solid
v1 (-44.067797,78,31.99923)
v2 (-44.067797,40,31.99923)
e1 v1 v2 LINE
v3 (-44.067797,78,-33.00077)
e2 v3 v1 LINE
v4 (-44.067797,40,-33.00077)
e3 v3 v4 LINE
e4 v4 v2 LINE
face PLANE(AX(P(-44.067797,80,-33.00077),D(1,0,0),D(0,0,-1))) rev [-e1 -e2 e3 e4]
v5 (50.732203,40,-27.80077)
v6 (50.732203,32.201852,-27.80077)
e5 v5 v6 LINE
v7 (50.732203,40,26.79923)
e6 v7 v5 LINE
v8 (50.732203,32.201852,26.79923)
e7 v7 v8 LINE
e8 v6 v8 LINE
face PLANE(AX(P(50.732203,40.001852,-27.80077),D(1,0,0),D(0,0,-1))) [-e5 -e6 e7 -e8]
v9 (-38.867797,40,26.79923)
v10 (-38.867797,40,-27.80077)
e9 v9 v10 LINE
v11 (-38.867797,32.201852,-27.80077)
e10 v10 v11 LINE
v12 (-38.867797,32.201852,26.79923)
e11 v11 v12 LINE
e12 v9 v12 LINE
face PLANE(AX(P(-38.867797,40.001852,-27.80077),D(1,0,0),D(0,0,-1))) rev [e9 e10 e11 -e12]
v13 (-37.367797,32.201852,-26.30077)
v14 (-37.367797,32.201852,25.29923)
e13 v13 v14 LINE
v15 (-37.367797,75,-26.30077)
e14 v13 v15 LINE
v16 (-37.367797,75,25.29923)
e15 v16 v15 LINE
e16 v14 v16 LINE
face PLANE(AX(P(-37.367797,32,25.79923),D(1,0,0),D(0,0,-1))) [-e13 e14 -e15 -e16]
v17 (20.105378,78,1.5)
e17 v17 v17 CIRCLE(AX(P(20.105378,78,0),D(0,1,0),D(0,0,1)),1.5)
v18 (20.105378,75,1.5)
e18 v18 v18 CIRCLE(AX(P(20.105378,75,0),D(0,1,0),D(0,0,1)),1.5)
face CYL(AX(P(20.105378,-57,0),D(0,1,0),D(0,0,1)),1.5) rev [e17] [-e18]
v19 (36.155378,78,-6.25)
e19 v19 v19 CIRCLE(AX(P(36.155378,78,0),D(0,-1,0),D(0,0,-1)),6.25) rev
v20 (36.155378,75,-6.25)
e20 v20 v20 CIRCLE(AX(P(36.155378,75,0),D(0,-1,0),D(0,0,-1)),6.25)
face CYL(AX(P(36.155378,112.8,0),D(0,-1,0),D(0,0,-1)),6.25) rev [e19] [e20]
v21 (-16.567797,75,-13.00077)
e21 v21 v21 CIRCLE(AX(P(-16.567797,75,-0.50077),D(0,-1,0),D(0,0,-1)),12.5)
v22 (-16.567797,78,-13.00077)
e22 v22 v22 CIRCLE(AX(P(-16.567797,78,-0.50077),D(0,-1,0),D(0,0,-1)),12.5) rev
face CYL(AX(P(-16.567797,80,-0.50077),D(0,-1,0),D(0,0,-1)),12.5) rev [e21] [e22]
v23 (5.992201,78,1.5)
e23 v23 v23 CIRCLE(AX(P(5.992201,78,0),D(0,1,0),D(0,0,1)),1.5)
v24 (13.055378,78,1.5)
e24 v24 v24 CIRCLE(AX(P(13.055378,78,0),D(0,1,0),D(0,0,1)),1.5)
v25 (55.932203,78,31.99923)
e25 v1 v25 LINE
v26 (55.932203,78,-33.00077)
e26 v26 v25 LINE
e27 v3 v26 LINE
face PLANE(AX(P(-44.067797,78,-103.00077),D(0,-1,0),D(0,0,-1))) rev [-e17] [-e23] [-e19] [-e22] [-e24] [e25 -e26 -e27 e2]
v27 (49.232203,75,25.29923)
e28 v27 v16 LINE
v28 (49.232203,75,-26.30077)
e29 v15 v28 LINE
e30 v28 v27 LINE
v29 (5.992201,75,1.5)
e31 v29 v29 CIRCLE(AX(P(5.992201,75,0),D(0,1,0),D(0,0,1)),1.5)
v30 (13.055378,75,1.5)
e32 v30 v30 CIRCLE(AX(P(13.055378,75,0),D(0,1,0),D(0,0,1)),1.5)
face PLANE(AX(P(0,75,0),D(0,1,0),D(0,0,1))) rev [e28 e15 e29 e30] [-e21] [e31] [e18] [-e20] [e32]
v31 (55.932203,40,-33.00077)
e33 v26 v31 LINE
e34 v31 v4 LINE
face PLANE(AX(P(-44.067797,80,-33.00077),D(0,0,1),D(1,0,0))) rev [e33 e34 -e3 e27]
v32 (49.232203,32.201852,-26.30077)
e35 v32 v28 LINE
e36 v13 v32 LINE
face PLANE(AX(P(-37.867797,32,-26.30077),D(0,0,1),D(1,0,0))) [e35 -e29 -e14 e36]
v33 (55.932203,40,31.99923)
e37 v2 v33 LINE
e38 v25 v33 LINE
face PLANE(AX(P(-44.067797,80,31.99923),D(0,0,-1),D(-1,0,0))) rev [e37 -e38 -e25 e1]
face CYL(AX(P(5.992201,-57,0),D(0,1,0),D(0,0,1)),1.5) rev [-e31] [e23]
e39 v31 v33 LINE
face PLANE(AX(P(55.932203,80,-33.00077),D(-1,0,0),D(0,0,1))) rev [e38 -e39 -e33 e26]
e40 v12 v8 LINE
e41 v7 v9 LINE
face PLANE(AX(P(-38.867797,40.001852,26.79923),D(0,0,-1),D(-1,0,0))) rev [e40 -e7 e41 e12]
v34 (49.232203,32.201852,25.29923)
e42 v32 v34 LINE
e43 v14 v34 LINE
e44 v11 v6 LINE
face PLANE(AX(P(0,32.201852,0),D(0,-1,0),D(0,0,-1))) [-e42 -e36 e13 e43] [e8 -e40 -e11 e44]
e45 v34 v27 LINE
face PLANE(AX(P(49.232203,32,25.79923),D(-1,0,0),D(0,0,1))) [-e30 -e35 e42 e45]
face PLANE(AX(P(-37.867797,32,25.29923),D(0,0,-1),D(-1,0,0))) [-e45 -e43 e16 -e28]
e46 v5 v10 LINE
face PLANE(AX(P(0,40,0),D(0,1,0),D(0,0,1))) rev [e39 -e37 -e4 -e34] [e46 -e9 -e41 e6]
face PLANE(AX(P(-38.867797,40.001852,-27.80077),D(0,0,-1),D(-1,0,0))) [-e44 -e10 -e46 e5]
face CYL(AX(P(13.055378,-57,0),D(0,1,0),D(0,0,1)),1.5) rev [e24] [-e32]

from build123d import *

# Parameters (mm, degrees)
STOCK_PART1_1_START         = 40
STOCK_PART1_1_OUTLINE_W     = 90
STOCK_PART1_1_OUTLINE_H     = 55
STOCK_PART1_1_DEPTH         = 40
STOCK_PART1_1_START_2       = 75
STOCK_PART1_1_2_OUTLINE_W   = 90
STOCK_PART1_1_2_OUTLINE_H   = 55
STOCK_PART1_1_2_OUTLINE_R   = 6.10322586
STOCK_PART1_1_2_OUTLINE_R_2 = 17.5
STOCK_PART1_1_2_DEPTH       = 5
SKETCH1_W                   = 5
SKETCH1_H                   = 8.27683309
SKETCH1_W_2                 = 4.100738493
SKETCH1_H_2                 = 4.176305195
SKETCH1_W_3                 = 4.702811088
SKETCH1_H_3                 = 4.424974218
SKETCH1_W_4                 = 6.384187924
SKETCH1_H_4                 = 4.971555085
BOSS_EXTRUDE2_DEPTH         = 40
SKETCH2_W                   = 90
SKETCH2_H                   = 55
SKETCH2_W_2                 = 87.6
SKETCH2_H_2                 = 52.6
EXTRUDE_THIN1_DEPTH         = 35
SKETCH3_W                   = 89.6
SKETCH3_H                   = 54.6
SKETCH3_W_2                 = 87.6
SKETCH3_H_2                 = 52.6
EXTRUDE_THIN2_DEPTH         = 35
SKETCH4_R                   = 23.5
SKETCH4_R_2                 = 12.5
EXTRUDE_THIN3_DEPTH         = 5
SKETCH5_W                   = 54.6
SKETCH5_H                   = 27.201852287
CUT_EXTRUDE1_DEPTH          = 115
SKETCH6_W                   = 87.6
SKETCH6_H                   = 52.6
SKETCH6_W_2                 = 86.6
SKETCH6_H_2                 = 51.6
EXTRUDE_THIN4_DEPTH         = 43
SKETCH8_W                   = 92.344497842
SKETCH8_H                   = 10.122612515
CUT_EXTRUDE3_DEPTH          = 97.8
SKETCH7_W                   = 89.6
SKETCH7_H                   = 54.6
SKETCH7_W_2                 = 86.6
SKETCH7_H_2                 = 51.6
EXTRUDE_THIN5_DEPTH         = 7.8
SKETCH9_R                   = 6.25
CUT_EXTRUDE4_DEPTH          = 37.8
SKETCH11_W                  = 37.538664257
SKETCH11_H                  = 33.375163033
BOSS_EXTRUDE3_DEPTH         = 5
SKETCH10_R                  = 12.5
CUT_EXTRUDE5_DEPTH          = 5
SKETCH12_W                  = 100
SKETCH12_H                  = 2
CUT_EXTRUDE6_DEPTH          = 135
SKETCH14_R                  = 1.5
CUT_EXTRUDE7_DEPTH          = 135


# Read off the part's stored shape, not the designer's step: Stock-Part1-1
with BuildPart() as part:
    # Stock-Part1-1 outline → Stock-Part1-1 (new body)
    with BuildSketch(Plane(origin=(0, 0, 0), x_dir=(1, 0, 0), z_dir=(0, 1, 0)).offset(STOCK_PART1_1_START)):
        with BuildLine():
            Line((55.93220339, -29.999229584), (55.93220339, 31.000770416))
            ThreePointArc((55.93220339, 31.000770416), (52.517989827, 29.586556854), (53.93220339, 33.000770416))
            Line((53.93220339, 33.000770416), (-42.06779661, 33.000770416))
            ThreePointArc((-42.06779661, 33.000770416), (-40.653583048, 29.586556854), (-44.06779661, 31.000770416))
            Line((-44.06779661, 31.000770416), (-44.06779661, -29.999229584))
            ThreePointArc((-44.06779661, -29.999229584), (-40.653583048, -28.585016022), (-42.06779661, -31.999229584))
            Line((-42.06779661, -31.999229584), (53.93220339, -31.999229584))
            ThreePointArc((53.93220339, -31.999229584), (52.517989827, -28.585016021), (55.93220339, -29.999229584))
        make_face()
        with Locations((5.93220339, 0.500770416)):
            Rectangle(STOCK_PART1_1_OUTLINE_W, STOCK_PART1_1_OUTLINE_H, mode=Mode.SUBTRACT)
    extrude(amount=STOCK_PART1_1_DEPTH)

    # Stock-Part1-1 2 outline → Stock-Part1-1 2 (add)
    with BuildSketch(Plane(origin=(0, 0, 0), x_dir=(1, 0, 0), z_dir=(0, 1, 0)).offset(STOCK_PART1_1_START_2)):
        with Locations((5.93220339, 0.500770416)):
            Rectangle(STOCK_PART1_1_2_OUTLINE_W, STOCK_PART1_1_2_OUTLINE_H)
        with Locations((36.155377847, 0)):
            Circle(STOCK_PART1_1_2_OUTLINE_R, mode=Mode.SUBTRACT)
        with Locations((-11.56779661, 0.500770416)):
            Circle(STOCK_PART1_1_2_OUTLINE_R_2, mode=Mode.SUBTRACT)
    extrude(amount=STOCK_PART1_1_2_DEPTH)

    # Sketch1 → Boss-Extrude2 (add)
    with BuildSketch(Plane.XZ.offset(-40)):
        with Locations((-41.56779661, -28.862353871)):
            Rectangle(SKETCH1_W, SKETCH1_H)
        with Locations((53.881834144, -30.912617819)):
            Rectangle(SKETCH1_W_2, SKETCH1_H_2)
        with Locations((53.580797846, 29.786742475)):
            Rectangle(SKETCH1_W_3, SKETCH1_H_3)
        with Locations((-40.875702648, 29.513452042)):
            Rectangle(SKETCH1_W_4, SKETCH1_H_4)
    extrude(amount=-BOSS_EXTRUDE2_DEPTH)

    # Sketch2 → Extrude-Thin1 (add)
    with BuildSketch(Plane.XZ.offset(-75)):
        with Locations((5.93220339, -0.500770416)):
            Rectangle(SKETCH2_W, SKETCH2_H)
        with Locations((5.93220339, -0.500770416)):
            Rectangle(SKETCH2_W_2, SKETCH2_H_2, mode=Mode.SUBTRACT)
    extrude(amount=EXTRUDE_THIN1_DEPTH)

    # Sketch3 → Extrude-Thin2 (add)
    with BuildSketch(Plane.XZ.offset(-40)):
        with Locations((5.93220339, -0.500770416)):
            Rectangle(SKETCH3_W, SKETCH3_H)
        with Locations((5.93220339, -0.500770416)):
            Rectangle(SKETCH3_W_2, SKETCH3_H_2, mode=Mode.SUBTRACT)
    extrude(amount=EXTRUDE_THIN2_DEPTH)

    # Sketch4 → Extrude-Thin3 (add)
    with BuildSketch(Plane(origin=(0, 80, 0), x_dir=(1, 0, 0), z_dir=(0, 1, 0))):
        with Locations((-11.56779661, 0.500770416)):
            Circle(SKETCH4_R)
        with Locations((-11.56779661, 0.500770416)):
            Circle(SKETCH4_R_2, mode=Mode.SUBTRACT)
    extrude(amount=-EXTRUDE_THIN3_DEPTH)

    # Sketch5 → Cut-Extrude1 (cut)
    with BuildSketch(Plane.ZY.offset(38.86779661)):
        with Locations((-0.500770416, 18.600926144)):
            Rectangle(SKETCH5_W, SKETCH5_H)
    extrude(amount=-CUT_EXTRUDE1_DEPTH, mode=Mode.SUBTRACT)

    # Sketch6 → Extrude-Thin4 (add)
    with BuildSketch(Plane.XZ.offset(-75)):
        with Locations((5.93220339, -0.500770416)):
            Rectangle(SKETCH6_W, SKETCH6_H)
        with Locations((5.93220339, -0.500770416)):
            Rectangle(SKETCH6_W_2, SKETCH6_H_2, mode=Mode.SUBTRACT)
    extrude(amount=EXTRUDE_THIN4_DEPTH)

    # Sketch8 → Cut-Extrude3 (cut)
    with BuildSketch(Plane.XY.offset(26.799229584)):
        with Locations((7.304452311, 34.938693742)):
            Rectangle(SKETCH8_W, SKETCH8_H)
    extrude(amount=-CUT_EXTRUDE3_DEPTH, mode=Mode.SUBTRACT)

    # Sketch7 → Extrude-Thin5 (add)
    with BuildSketch(Plane.XZ.offset(-32.201852287)):
        with Locations((5.93220339, -0.500770416)):
            Rectangle(SKETCH7_W, SKETCH7_H)
        with Locations((5.93220339, -0.500770416)):
            Rectangle(SKETCH7_W_2, SKETCH7_H_2, mode=Mode.SUBTRACT)
    extrude(amount=-EXTRUDE_THIN5_DEPTH)

    # Sketch9 → Cut-Extrude4 (cut)
    with BuildSketch(Plane.XZ.offset(-75)):
        with Locations(Location((36.155377847, 0, 0), (0, 0, 270))):
            Circle(SKETCH9_R)
    extrude(amount=-CUT_EXTRUDE4_DEPTH, mode=Mode.SUBTRACT)

    # Sketch11 → Boss-Extrude3 (add)
    with BuildSketch(Plane(origin=(0, 80, 0), x_dir=(1, 0, 0), z_dir=(0, 1, 0))):
        with Locations((-12.97143523, -0.741564626)):
            Rectangle(SKETCH11_W, SKETCH11_H)
    extrude(amount=-BOSS_EXTRUDE3_DEPTH)

    # Sketch10 → Cut-Extrude5 (cut)
    with BuildSketch(Plane.XZ.offset(-75)):
        with Locations(Location((-16.56779661, -0.500770416, 0), (0, 0, 270))):
            Circle(SKETCH10_R)
    extrude(amount=-CUT_EXTRUDE5_DEPTH, mode=Mode.SUBTRACT)

    # Sketch12 → Cut-Extrude6 (cut)
    with BuildSketch(Plane.XY.offset(31.999229584)):
        with Locations((5.93220339, 79)):
            Rectangle(SKETCH12_W, SKETCH12_H)
    extrude(amount=-CUT_EXTRUDE6_DEPTH, mode=Mode.SUBTRACT)

    # Sketch14 → Cut-Extrude7 (cut)
    with BuildSketch(Plane(origin=(0, 78, 0), x_dir=(1, 0, 0), z_dir=(0, 1, 0))):
        with Locations(Location((13.055377847, 0, 0), (0, 0, 270))):
            Circle(SKETCH14_R)
        with Locations(Location((20.105377847, 0, 0), (0, 0, 270))):
            Circle(SKETCH14_R)
        with Locations(Location((5.992200992, 0, 0), (0, 0, 270))):
            Circle(SKETCH14_R)
    extrude(amount=-CUT_EXTRUDE7_DEPTH, mode=Mode.SUBTRACT)


solid = part.part
